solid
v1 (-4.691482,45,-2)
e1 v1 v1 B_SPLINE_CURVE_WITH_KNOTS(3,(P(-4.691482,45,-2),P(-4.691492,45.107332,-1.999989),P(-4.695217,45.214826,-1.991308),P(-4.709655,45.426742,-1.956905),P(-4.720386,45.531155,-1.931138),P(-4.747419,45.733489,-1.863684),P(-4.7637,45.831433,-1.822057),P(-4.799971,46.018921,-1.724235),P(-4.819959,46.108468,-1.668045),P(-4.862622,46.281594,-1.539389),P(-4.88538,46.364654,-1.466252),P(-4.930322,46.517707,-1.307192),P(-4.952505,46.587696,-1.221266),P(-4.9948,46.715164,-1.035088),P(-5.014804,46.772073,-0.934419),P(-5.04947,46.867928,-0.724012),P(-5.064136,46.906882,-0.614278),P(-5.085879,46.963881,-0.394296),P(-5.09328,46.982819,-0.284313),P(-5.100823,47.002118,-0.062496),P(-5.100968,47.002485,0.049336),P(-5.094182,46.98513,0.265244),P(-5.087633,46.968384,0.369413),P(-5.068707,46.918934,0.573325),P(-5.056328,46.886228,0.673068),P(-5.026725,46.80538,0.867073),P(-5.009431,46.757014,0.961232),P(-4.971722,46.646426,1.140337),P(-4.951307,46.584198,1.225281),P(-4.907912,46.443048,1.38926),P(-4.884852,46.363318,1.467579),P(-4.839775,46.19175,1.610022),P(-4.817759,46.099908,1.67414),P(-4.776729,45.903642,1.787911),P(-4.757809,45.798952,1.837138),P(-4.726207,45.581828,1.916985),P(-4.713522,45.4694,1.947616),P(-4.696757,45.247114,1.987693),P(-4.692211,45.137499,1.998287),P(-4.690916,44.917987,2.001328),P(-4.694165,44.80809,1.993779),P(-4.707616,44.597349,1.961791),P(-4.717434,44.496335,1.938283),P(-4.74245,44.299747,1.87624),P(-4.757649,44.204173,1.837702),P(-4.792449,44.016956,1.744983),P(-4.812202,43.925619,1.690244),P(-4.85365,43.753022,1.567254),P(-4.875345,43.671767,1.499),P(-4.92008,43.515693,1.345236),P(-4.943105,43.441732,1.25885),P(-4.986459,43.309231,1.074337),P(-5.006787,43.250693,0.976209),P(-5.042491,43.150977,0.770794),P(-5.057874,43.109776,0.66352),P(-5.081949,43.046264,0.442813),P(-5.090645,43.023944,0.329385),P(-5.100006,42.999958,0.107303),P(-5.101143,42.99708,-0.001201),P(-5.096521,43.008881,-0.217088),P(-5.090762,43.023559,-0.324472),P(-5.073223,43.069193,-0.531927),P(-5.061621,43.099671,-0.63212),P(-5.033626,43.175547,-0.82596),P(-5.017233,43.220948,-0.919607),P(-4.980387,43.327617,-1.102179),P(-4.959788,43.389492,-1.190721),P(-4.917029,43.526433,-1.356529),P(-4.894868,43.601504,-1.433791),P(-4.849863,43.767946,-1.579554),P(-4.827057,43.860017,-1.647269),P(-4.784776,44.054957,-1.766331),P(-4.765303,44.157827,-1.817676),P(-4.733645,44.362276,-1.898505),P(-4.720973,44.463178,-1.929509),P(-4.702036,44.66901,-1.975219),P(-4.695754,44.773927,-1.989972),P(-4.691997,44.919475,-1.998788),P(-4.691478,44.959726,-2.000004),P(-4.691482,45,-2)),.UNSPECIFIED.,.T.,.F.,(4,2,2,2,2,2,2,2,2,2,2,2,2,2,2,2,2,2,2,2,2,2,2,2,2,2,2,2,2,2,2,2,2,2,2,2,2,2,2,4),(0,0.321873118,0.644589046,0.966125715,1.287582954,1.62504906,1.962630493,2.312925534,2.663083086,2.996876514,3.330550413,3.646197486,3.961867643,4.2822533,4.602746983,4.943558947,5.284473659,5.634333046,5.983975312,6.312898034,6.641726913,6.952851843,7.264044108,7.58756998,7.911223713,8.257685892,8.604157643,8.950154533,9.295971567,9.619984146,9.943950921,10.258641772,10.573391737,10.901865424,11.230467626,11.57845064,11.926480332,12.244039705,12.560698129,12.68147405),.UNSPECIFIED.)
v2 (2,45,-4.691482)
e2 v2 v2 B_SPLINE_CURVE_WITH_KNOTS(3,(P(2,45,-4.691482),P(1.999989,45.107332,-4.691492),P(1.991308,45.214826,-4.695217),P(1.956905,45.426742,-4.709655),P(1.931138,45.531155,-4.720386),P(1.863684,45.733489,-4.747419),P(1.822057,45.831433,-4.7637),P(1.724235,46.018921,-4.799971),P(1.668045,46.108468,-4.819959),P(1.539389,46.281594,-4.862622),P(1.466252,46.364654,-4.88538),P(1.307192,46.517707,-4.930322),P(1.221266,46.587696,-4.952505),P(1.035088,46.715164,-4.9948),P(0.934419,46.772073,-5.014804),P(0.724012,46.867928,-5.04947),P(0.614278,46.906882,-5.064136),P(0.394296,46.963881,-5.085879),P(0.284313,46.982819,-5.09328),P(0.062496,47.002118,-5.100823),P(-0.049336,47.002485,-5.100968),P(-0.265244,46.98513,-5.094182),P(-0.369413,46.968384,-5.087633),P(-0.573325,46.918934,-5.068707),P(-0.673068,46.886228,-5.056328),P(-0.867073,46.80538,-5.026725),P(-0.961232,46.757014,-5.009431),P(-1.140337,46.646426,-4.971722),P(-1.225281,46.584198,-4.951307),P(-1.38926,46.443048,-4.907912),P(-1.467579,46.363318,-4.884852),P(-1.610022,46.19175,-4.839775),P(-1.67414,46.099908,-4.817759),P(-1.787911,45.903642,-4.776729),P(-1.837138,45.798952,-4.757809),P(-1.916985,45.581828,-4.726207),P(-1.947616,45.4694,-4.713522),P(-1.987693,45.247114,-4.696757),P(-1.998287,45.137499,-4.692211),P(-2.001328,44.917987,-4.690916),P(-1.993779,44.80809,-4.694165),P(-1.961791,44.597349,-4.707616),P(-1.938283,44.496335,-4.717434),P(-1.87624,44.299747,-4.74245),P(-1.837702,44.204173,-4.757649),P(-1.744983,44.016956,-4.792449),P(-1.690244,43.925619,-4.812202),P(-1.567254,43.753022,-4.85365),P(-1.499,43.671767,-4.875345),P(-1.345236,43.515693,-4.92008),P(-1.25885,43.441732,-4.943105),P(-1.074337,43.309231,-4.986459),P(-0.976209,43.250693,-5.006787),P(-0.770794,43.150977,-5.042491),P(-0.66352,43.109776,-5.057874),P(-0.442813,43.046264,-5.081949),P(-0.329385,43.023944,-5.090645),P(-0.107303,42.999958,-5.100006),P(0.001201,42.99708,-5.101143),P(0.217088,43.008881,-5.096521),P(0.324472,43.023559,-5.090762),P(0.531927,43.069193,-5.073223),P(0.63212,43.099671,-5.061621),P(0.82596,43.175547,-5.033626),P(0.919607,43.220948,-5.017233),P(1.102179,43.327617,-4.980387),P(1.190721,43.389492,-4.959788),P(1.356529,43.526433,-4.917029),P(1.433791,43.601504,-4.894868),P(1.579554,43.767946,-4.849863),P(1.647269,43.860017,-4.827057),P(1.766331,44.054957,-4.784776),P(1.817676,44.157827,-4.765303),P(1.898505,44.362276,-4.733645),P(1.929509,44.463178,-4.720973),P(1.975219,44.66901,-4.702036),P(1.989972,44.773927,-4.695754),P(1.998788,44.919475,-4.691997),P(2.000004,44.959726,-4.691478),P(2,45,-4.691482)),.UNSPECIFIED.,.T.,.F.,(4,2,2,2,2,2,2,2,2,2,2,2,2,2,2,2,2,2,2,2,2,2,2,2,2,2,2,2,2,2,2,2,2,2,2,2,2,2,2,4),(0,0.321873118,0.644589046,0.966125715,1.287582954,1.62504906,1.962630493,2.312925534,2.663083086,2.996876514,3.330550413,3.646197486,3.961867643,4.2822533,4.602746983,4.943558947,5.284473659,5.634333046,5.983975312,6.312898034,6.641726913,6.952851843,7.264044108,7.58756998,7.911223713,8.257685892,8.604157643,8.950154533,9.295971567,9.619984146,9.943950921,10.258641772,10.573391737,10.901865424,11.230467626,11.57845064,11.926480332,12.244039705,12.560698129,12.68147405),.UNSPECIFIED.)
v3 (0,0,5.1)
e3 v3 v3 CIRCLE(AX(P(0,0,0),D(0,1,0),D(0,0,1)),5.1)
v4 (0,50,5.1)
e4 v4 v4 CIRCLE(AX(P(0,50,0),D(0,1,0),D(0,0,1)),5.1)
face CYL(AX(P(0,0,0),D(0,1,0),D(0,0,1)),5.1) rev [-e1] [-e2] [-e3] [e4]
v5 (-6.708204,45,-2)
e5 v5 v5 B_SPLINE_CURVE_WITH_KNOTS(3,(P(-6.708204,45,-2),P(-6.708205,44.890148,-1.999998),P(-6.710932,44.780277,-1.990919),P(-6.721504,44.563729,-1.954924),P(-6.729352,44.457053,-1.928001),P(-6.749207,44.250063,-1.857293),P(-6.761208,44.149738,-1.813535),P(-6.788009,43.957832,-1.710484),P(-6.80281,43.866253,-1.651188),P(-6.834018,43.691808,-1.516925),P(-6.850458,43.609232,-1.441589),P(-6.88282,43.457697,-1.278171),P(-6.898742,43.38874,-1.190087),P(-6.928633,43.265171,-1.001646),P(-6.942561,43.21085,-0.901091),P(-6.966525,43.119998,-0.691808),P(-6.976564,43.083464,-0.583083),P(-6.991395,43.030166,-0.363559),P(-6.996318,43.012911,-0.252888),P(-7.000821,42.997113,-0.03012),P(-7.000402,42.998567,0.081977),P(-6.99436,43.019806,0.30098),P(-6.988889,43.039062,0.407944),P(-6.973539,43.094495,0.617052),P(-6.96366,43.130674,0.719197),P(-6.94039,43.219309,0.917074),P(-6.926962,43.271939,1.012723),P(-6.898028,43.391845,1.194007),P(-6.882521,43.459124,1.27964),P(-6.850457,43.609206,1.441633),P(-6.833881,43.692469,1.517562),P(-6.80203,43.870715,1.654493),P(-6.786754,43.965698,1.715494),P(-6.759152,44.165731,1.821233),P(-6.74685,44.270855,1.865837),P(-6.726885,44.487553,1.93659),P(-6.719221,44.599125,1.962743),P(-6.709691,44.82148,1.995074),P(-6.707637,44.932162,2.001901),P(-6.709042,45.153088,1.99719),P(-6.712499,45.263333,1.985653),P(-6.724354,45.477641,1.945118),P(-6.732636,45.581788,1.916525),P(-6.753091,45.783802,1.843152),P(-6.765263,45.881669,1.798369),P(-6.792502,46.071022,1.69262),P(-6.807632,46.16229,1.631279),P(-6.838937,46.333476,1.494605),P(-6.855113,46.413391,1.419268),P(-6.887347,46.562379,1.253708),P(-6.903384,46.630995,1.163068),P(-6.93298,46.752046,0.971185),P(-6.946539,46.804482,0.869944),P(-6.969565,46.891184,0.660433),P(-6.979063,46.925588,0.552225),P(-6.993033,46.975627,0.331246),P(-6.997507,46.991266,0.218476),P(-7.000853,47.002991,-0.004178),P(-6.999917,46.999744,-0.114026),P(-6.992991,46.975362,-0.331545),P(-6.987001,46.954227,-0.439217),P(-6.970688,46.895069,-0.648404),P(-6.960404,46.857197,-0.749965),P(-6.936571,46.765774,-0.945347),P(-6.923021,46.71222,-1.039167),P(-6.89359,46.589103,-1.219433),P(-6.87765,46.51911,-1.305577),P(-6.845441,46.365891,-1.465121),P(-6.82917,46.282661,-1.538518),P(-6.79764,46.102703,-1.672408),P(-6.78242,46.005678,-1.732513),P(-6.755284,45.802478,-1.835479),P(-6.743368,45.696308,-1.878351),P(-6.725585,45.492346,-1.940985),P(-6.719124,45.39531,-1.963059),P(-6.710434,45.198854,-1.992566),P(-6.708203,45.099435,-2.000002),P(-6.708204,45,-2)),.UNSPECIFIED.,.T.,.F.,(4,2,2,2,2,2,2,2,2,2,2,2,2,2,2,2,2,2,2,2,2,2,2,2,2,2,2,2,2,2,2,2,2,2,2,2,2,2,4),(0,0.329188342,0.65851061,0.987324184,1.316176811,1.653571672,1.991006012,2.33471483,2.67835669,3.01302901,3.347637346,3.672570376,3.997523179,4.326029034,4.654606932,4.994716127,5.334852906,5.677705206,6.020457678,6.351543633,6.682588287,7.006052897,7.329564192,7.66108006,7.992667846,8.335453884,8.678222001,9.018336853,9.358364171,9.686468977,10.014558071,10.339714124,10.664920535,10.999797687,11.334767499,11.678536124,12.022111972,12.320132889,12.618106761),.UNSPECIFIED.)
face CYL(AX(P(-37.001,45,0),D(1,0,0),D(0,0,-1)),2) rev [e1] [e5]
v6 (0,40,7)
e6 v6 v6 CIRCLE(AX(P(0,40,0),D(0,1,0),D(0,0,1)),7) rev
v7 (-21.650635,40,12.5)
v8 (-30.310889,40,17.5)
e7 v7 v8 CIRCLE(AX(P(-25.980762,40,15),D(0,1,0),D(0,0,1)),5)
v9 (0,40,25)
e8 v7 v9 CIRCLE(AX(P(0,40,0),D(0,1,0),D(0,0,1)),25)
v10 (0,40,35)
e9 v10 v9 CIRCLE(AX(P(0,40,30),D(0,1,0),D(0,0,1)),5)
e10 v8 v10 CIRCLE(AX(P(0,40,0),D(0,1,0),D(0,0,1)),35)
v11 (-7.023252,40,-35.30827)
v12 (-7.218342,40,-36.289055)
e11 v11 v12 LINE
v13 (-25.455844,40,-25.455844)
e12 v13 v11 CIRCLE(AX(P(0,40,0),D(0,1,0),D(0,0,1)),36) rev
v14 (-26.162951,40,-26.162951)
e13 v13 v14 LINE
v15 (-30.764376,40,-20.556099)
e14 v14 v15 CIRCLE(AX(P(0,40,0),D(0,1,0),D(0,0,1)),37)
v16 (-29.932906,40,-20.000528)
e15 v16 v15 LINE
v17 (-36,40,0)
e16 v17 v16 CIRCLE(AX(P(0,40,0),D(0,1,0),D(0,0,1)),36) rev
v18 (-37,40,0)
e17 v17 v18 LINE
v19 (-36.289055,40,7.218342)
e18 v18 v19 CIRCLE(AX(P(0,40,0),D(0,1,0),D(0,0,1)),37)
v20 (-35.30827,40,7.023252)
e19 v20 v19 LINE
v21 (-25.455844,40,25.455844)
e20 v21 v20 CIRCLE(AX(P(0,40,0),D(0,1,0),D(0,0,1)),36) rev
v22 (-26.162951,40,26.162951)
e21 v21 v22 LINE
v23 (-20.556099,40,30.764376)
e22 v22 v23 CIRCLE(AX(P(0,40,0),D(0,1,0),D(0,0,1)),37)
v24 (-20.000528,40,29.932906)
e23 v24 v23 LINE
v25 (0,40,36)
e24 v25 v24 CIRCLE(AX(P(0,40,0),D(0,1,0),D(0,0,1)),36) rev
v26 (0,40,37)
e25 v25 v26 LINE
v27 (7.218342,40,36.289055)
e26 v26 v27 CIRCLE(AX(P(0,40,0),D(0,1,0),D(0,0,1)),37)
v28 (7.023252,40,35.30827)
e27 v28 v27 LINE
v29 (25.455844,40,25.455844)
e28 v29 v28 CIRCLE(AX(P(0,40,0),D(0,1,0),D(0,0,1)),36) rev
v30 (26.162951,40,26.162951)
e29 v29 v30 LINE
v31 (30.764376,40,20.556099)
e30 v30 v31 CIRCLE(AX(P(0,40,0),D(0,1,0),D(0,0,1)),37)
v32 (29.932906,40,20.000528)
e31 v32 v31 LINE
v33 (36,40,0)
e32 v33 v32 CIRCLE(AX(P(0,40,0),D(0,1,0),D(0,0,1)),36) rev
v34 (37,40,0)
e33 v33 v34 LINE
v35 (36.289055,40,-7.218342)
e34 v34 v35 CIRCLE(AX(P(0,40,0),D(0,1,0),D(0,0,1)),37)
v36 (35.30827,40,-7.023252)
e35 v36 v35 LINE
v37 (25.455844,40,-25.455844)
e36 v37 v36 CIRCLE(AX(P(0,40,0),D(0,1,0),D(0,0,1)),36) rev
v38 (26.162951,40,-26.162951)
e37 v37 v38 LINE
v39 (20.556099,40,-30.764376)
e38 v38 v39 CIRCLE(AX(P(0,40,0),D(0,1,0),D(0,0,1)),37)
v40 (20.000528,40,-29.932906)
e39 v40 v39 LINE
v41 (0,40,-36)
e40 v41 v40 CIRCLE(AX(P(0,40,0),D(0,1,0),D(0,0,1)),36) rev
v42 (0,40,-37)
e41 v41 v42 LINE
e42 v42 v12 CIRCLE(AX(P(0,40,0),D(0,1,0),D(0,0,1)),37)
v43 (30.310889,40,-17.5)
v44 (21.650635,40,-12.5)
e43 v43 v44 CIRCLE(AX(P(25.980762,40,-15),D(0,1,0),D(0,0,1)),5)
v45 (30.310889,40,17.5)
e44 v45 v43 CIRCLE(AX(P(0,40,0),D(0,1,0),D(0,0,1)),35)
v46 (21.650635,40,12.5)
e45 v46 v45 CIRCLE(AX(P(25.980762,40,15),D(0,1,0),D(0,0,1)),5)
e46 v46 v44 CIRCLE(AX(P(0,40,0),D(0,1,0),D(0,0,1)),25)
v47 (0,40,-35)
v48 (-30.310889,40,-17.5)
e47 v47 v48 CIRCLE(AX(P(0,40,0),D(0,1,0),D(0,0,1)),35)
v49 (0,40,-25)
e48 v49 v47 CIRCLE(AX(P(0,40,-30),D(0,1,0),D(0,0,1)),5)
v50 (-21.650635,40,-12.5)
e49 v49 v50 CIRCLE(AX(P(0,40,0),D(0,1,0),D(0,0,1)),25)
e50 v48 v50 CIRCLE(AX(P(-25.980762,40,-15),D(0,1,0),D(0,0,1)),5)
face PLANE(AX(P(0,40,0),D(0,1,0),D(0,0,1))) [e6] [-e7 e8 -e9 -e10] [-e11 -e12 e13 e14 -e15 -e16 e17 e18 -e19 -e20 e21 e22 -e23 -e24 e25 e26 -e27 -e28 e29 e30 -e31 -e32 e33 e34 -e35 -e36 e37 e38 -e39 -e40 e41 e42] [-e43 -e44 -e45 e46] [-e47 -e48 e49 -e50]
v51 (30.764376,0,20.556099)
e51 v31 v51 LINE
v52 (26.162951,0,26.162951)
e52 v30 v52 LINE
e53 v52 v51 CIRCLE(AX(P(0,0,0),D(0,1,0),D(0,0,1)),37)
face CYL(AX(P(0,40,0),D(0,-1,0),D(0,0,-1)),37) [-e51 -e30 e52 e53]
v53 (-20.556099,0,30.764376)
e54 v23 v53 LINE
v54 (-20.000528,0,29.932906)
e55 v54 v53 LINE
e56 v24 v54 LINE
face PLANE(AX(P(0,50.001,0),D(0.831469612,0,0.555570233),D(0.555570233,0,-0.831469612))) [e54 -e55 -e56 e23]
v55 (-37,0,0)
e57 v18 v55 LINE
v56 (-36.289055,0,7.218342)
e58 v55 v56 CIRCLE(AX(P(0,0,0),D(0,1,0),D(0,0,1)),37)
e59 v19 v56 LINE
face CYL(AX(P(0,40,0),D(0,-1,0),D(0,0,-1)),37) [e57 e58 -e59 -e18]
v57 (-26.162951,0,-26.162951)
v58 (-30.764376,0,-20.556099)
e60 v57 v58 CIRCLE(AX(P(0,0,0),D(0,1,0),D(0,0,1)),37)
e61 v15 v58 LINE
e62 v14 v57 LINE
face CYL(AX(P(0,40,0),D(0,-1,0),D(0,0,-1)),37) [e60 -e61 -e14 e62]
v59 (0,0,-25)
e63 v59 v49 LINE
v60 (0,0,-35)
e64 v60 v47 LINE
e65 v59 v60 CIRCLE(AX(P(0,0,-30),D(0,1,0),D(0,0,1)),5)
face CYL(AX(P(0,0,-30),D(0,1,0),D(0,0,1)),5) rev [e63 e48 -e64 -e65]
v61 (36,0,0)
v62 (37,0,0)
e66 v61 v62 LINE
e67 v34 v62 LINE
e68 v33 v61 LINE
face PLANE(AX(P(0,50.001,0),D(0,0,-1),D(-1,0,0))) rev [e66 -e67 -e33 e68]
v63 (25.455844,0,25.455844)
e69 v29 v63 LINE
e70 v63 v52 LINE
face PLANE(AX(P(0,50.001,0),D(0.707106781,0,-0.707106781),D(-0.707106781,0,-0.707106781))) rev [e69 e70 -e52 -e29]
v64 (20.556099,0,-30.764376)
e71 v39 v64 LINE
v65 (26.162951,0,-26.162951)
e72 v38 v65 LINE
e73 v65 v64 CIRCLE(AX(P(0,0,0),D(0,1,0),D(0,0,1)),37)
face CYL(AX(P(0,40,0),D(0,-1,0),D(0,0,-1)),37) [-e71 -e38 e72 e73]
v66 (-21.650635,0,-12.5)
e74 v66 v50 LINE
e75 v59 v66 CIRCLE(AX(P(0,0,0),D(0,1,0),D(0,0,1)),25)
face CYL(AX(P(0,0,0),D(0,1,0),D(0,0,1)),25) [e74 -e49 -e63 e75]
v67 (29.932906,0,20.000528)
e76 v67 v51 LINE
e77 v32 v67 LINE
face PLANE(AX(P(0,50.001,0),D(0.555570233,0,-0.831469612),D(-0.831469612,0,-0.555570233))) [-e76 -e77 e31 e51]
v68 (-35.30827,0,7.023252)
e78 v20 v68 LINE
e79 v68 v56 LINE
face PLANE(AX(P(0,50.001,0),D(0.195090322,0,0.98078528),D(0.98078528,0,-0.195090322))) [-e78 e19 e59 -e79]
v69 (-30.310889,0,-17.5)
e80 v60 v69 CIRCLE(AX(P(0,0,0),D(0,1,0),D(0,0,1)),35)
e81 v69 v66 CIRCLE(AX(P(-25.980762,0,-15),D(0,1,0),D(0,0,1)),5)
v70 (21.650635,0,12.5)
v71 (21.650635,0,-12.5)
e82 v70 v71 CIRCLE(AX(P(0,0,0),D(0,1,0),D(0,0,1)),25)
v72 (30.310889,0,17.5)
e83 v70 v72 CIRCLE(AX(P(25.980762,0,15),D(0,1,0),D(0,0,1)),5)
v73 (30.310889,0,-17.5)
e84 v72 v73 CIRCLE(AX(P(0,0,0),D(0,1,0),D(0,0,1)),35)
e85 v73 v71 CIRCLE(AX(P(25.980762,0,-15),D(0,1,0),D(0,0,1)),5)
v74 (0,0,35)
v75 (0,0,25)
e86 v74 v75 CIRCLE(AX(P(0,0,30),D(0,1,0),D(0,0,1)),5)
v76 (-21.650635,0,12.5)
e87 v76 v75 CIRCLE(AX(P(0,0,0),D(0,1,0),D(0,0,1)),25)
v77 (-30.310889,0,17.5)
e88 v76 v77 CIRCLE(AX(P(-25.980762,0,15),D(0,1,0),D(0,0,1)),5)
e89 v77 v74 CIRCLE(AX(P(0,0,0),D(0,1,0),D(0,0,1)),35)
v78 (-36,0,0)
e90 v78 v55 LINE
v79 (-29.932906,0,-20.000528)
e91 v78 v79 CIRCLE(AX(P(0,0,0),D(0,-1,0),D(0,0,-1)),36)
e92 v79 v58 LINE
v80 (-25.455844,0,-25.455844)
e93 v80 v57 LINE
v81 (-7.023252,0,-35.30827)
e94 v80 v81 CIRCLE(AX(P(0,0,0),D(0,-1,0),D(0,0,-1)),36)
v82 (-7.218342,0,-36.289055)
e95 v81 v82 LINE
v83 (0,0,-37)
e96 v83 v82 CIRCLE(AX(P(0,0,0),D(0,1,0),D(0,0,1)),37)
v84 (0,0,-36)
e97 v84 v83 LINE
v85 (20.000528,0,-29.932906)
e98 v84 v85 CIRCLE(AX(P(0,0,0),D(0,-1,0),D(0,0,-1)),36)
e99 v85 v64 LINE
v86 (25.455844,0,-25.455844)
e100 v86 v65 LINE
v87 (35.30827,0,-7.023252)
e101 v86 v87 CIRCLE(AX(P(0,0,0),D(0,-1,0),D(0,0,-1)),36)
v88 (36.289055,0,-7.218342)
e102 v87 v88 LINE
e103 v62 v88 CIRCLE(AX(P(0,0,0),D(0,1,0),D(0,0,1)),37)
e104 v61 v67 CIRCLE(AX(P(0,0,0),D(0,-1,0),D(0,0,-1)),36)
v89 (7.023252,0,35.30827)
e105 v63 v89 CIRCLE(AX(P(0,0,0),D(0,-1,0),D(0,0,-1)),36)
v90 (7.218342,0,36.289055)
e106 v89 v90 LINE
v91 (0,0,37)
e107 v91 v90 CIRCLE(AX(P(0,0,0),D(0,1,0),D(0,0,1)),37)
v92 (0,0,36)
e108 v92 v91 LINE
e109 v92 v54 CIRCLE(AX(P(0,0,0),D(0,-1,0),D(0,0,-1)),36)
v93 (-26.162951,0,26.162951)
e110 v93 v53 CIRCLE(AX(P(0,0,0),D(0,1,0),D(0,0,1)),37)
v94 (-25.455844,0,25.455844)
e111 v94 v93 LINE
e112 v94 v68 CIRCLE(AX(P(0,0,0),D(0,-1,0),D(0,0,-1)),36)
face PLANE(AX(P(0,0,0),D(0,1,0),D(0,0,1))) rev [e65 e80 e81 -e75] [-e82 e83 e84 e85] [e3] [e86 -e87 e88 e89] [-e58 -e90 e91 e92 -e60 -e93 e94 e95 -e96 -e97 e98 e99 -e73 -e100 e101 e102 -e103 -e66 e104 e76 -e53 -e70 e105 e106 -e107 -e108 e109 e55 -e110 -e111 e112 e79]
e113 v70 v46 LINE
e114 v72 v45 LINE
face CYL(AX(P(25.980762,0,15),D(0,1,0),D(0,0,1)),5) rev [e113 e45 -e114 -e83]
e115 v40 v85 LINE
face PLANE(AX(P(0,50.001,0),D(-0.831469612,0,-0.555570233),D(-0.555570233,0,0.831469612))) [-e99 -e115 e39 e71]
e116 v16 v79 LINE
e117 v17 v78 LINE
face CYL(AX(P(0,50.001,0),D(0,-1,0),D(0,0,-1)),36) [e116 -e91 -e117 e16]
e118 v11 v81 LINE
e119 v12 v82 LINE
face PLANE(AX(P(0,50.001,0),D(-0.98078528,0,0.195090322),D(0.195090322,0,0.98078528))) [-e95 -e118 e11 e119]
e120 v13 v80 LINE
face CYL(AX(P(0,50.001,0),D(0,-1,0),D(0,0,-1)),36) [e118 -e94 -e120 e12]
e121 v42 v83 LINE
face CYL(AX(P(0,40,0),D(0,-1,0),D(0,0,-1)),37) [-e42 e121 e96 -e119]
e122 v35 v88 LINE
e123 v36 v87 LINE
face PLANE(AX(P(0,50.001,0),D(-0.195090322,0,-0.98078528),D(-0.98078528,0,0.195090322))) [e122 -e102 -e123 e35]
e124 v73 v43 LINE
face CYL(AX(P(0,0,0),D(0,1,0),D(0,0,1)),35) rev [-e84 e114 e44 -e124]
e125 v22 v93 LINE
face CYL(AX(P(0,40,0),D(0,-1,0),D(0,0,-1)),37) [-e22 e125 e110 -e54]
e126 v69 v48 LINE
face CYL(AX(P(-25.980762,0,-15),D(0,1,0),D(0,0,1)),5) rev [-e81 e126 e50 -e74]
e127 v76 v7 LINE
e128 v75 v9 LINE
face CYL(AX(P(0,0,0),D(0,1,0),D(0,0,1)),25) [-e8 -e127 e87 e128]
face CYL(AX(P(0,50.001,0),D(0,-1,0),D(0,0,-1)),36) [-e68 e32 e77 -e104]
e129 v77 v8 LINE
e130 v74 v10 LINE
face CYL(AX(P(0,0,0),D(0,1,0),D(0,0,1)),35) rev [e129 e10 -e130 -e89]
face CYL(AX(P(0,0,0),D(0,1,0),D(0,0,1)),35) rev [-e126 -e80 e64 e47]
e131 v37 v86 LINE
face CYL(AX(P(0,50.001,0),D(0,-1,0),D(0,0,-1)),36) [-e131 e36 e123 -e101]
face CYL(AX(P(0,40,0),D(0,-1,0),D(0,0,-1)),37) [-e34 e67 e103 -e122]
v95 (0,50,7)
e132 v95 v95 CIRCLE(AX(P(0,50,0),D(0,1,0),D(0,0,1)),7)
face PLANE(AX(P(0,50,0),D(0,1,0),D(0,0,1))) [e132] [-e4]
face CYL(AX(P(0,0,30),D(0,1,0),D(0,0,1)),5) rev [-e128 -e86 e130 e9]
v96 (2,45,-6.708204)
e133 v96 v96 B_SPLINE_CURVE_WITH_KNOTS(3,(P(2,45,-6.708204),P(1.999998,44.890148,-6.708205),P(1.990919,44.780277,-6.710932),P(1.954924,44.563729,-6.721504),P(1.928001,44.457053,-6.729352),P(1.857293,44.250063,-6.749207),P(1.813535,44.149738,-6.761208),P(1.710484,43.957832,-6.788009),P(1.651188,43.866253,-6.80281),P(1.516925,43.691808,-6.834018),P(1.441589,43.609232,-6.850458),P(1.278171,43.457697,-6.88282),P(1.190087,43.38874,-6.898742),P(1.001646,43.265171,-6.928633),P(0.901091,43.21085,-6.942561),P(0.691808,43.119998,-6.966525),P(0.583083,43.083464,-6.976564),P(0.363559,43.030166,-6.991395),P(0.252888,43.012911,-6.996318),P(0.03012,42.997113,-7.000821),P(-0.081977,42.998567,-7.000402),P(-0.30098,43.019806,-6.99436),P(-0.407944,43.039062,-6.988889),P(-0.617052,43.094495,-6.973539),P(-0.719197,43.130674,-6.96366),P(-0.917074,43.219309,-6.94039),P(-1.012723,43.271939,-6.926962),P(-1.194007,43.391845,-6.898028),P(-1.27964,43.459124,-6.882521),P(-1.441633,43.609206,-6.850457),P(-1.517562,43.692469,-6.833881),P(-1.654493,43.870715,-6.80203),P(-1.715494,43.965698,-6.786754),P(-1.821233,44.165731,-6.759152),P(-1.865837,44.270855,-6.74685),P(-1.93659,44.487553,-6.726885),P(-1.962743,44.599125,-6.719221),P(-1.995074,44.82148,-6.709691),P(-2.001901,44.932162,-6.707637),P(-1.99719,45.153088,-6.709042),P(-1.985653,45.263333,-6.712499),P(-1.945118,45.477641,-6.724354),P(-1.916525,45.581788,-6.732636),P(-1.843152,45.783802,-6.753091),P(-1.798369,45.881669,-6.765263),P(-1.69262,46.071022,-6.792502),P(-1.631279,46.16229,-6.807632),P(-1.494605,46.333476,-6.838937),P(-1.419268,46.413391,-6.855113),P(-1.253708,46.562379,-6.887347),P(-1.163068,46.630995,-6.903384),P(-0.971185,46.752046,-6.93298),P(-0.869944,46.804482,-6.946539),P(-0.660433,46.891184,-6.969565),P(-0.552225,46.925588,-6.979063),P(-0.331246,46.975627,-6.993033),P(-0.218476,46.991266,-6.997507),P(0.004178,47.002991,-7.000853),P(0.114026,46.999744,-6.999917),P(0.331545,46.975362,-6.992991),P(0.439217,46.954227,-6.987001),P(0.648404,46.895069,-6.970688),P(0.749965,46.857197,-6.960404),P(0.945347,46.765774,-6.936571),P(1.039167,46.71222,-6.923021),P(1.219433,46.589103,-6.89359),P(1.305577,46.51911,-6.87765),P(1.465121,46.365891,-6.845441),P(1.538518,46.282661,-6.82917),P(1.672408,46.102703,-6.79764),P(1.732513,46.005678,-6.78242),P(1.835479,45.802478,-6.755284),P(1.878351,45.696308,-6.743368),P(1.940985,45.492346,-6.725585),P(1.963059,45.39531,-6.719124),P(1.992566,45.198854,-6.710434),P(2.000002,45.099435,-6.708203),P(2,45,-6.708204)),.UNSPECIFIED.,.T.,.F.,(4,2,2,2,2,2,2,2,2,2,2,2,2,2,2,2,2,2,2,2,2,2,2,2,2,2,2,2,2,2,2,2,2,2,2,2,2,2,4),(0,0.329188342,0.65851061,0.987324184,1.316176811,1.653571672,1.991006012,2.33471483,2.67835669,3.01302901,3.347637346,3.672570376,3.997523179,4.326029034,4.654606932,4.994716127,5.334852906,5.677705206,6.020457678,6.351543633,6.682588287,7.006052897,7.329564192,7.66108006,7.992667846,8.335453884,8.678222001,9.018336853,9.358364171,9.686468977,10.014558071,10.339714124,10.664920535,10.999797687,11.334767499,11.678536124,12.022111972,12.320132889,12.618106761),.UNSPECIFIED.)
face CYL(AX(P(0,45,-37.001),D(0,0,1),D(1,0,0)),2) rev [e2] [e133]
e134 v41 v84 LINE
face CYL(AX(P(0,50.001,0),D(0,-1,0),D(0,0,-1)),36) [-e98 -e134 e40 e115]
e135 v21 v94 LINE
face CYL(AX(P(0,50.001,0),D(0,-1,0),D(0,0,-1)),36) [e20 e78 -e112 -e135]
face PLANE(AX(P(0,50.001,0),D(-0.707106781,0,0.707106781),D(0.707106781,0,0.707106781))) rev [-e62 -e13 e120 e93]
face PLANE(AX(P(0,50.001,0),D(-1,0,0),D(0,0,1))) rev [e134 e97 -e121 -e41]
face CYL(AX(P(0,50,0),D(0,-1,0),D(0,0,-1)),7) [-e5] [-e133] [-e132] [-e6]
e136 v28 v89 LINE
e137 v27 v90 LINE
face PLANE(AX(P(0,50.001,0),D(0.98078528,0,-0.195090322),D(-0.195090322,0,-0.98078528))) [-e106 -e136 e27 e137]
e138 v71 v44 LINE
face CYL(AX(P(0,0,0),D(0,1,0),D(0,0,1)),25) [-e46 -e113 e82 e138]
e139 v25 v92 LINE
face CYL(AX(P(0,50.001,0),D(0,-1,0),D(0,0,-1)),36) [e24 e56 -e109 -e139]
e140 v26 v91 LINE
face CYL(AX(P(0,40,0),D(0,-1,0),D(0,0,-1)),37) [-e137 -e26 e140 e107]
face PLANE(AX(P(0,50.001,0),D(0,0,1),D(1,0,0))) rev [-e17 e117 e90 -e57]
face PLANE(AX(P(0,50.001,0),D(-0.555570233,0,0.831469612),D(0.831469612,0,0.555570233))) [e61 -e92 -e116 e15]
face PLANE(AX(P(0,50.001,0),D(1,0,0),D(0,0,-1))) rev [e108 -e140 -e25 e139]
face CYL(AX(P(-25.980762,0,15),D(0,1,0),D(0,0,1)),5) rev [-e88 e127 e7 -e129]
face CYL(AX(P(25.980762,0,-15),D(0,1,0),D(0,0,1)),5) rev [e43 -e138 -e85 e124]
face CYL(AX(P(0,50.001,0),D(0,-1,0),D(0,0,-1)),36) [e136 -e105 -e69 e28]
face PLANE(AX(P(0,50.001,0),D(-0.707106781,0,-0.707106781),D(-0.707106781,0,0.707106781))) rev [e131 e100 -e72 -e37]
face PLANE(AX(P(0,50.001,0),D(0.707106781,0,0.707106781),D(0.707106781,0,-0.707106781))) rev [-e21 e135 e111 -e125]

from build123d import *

# Parameters (mm, degrees)
SKETCH_1_R               = 37
EXTRUDE_1_DEPTH          = 40
SKETCH_2_R               = 5.1
CUT_EXTRUDE_1_DEPTH      = 40
CUT_EXTRUDE_START        = -40
CUT_EXTRUDE_2_DEPTH      = 40
SKETCH_4_R               = 7
SKETCH_4_R_2             = 5.1
EXTRUDE_2_DEPTH          = 10
CUT_EXTRUDE_3_REACH      = 74.374
CUT_EXTRUDE_3_END_RADIUS = 7
SKETCH_6_R               = 2
CUT_EXTRUDE_4_REACH      = 74.374
CUT_EXTRUDE_4_END_RADIUS = 7
SKETCH_7_R               = 2
CUT_EXTRUDE_7_REACH      = 74.374


# Read off the part's stored shape, not the designer's step: the extrude step
with BuildPart() as part:
    # 草图1 → 凸台-拉伸1 (new body)
    with BuildSketch(Plane(origin=(0, 0, 0), x_dir=(1, 0, 0), z_dir=(0, 1, 0))):
        with Locations(Location((0, 0, 0), (0, 0, 270))):
            Circle(SKETCH_1_R)
    extrude(amount=EXTRUDE_1_DEPTH)

    # 草图2 → 切除-拉伸1 (cut)
    with BuildSketch(Plane(origin=(0, 40, 0), x_dir=(1, 0, 0), z_dir=(0, 1, 0))):
        with Locations(Location((0, 0, 0), (0, 0, 270))):
            Circle(SKETCH_2_R)
    extrude(amount=-CUT_EXTRUDE_1_DEPTH, mode=Mode.SUBTRACT)

    # 切除-拉伸2 outline → 切除-拉伸2 (cut)
    with BuildSketch(Plane(origin=(0, 40, 0), x_dir=(1, 0, 0), z_dir=(0, 1, 0)).offset(CUT_EXTRUDE_START)):
        with BuildLine():
            ThreePointArc((0, 25), (5, 30), (0, 35))
            ThreePointArc((0, 35), (-17.5, 30.310889132), (-30.310889132, 17.5))
            ThreePointArc((-30.310889132, 17.5), (-28.480762114, 10.669872981), (-21.650635095, 12.5))
            ThreePointArc((-21.650635095, 12.5), (-12.5, 21.650635095), (0, 25))
        make_face()
        with BuildLine():
            ThreePointArc((-21.650635095, -12.5), (-28.480762114, -10.669872981), (-30.310889132, -17.5))
            ThreePointArc((-30.310889132, -17.5), (-17.5, -30.310889132), (0, -35))
            ThreePointArc((0, -35), (5, -30), (0, -25))
            ThreePointArc((0, -25), (-12.5, -21.650635095), (-21.650635095, -12.5))
        make_face()
        with BuildLine():
            ThreePointArc((21.650635095, -12.5), (23.480762113, -19.330127019), (30.310889132, -17.5))
            ThreePointArc((30.310889132, -17.5), (35, 0), (30.310889132, 17.5))
            ThreePointArc((30.310889132, 17.5), (23.480762113, 19.330127019), (21.650635095, 12.5))
            ThreePointArc((21.650635095, 12.5), (25, 0), (21.650635095, -12.5))
        make_face()
    extrude(amount=CUT_EXTRUDE_2_DEPTH, mode=Mode.SUBTRACT)

    # 草图4 → 凸台-拉伸2 (add, symmetric)
    with BuildSketch(Plane(origin=(0, 40, 0), x_dir=(1, 0, 0), z_dir=(0, 1, 0))):
        with Locations(Location((0, 0, 0), (0, 0, 270))):
            Circle(SKETCH_4_R)
        with Locations(Location((0, 0, 0), (0, 0, 270))):
            Circle(SKETCH_4_R_2, mode=Mode.SUBTRACT)
    extrude(amount=EXTRUDE_2_DEPTH, both=True)

    # 切除-拉伸3: up to this cylinder (the profile starts inside it)
    cut_extrude_3_end = Plane(origin=(0, 45, 0), z_dir=(0, -1, 0)) * Cylinder(CUT_EXTRUDE_3_END_RADIUS, 163.748, mode=Mode.PRIVATE)
    # 草图6 → 切除-拉伸3 (cut, up to the surface)
    with BuildSketch(Plane.XY, mode=Mode.PRIVATE) as cut_extrude_3_sk1:
        with Locations((0, 45)):
            Circle(SKETCH_6_R)
    cut_extrude_3_tool1 = extrude(cut_extrude_3_sk1.sketch, amount=-CUT_EXTRUDE_3_REACH, mode=Mode.PRIVATE) & cut_extrude_3_end
    add(cut_extrude_3_tool1.solids().sort_by_distance((0, 45, 0))[0], mode=Mode.SUBTRACT)

    # 切除-拉伸4: up to this cylinder (the profile starts inside it)
    cut_extrude_4_end = Plane(origin=(0, 45, 0), z_dir=(0, -1, 0)) * Cylinder(CUT_EXTRUDE_4_END_RADIUS, 163.748, mode=Mode.PRIVATE)
    # 草图7 → 切除-拉伸4 (cut, up to the surface)
    with BuildSketch(Plane(origin=(0, 0, 0), x_dir=(0, 0, -1), z_dir=(1, 0, 0)), mode=Mode.PRIVATE) as cut_extrude_4_sk1:
        with Locations((0, 45)):
            Circle(SKETCH_7_R)
    cut_extrude_4_tool1 = extrude(cut_extrude_4_sk1.sketch, amount=-CUT_EXTRUDE_4_REACH, mode=Mode.PRIVATE) & cut_extrude_4_end
    add(cut_extrude_4_tool1.solids().sort_by_distance((0, 45, 0))[0], mode=Mode.SUBTRACT)

    # 草图10 → 切除-拉伸7 (cut, up to next)
    with BuildSketch(Plane.XZ, mode=Mode.PRIVATE) as cut_extrude_7_sk1:
        with BuildLine():
            Line((-36.289055375, 7.218341915), (-35.308270095, 7.023251593))
            ThreePointArc((-35.308270095, 7.023251593), (-34.449852086, 10.450248381), (-33.25966317, 13.776603565))
            Line((-33.25966317, 13.776603565), (-34.183542703, 14.159286998))
            ThreePointArc((-34.183542703, 14.159286998), (-35.406792422, 10.740533058), (-36.289055375, 7.218341915))
        make_face()
    cut_extrude_7_tool1 = extrude(cut_extrude_7_sk1.sketch, amount=-CUT_EXTRUDE_7_REACH, mode=Mode.PRIVATE) & part.part
    # 草图10 → 切除-拉伸7 (cut, up to next)
    with BuildSketch(Plane.XZ, mode=Mode.PRIVATE) as cut_extrude_7_sk2:
        with BuildLine():
            Line((-34.183542703, 14.159286998), (-33.25966317, 13.776603565))
            ThreePointArc((-33.25966317, 13.776603565), (-31.749165517, 16.970282526), (-29.932906043, 20.000528389))
            Line((-29.932906043, 20.000528389), (-30.764375655, 20.556098622))
            ThreePointArc((-30.764375655, 20.556098622), (-32.631086781, 17.441679263), (-34.183542703, 14.159286998))
        make_face()
    cut_extrude_7_tool2 = extrude(cut_extrude_7_sk2.sketch, amount=-CUT_EXTRUDE_7_REACH, mode=Mode.PRIVATE) & part.part
    # 草图10 → 切除-拉伸7 (cut, up to next)
    with BuildSketch(Plane.XZ, mode=Mode.PRIVATE) as cut_extrude_7_sk3:
        with BuildLine():
            Line((-30.764375655, 20.556098622), (-29.932906043, 20.000528389))
            ThreePointArc((-29.932906043, 20.000528389), (-27.828376321, 22.83815823), (-25.455844123, 25.455844123))
            Line((-25.455844123, 25.455844123), (-26.162950904, 26.162950904))
            ThreePointArc((-26.162950904, 26.162950904), (-28.601386774, 23.472551514), (-30.764375655, 20.556098622))
        make_face()
    cut_extrude_7_tool3 = extrude(cut_extrude_7_sk3.sketch, amount=-CUT_EXTRUDE_7_REACH, mode=Mode.PRIVATE) & part.part
    # 草图10 → 切除-拉伸7 (cut, up to next)
    with BuildSketch(Plane.XZ, mode=Mode.PRIVATE) as cut_extrude_7_sk4:
        with BuildLine():
            Line((-20.556098622, 30.764375655), (-20.000528389, 29.932906043))
            ThreePointArc((-20.000528389, 29.932906043), (-16.970282526, 31.749165517), (-13.776603565, 33.25966317))
            Line((-13.776603565, 33.25966317), (-14.159286998, 34.183542703))
            ThreePointArc((-14.159286998, 34.183542703), (-17.441679263, 32.631086781), (-20.556098622, 30.764375655))
        make_face()
    cut_extrude_7_tool4 = extrude(cut_extrude_7_sk4.sketch, amount=-CUT_EXTRUDE_7_REACH, mode=Mode.PRIVATE) & part.part
    # 草图10 → 切除-拉伸7 (cut, up to next)
    with BuildSketch(Plane.XZ, mode=Mode.PRIVATE) as cut_extrude_7_sk5:
        with BuildLine():
            Line((-14.159286998, 34.183542703), (-13.776603565, 33.25966317))
            ThreePointArc((-13.776603565, 33.25966317), (-10.450248381, 34.449852086), (-7.023251593, 35.308270095))
            Line((-7.023251593, 35.308270095), (-7.218341915, 36.289055375))
            ThreePointArc((-7.218341915, 36.289055375), (-10.740533058, 35.406792422), (-14.159286998, 34.183542703))
        make_face()
    cut_extrude_7_tool5 = extrude(cut_extrude_7_sk5.sketch, amount=-CUT_EXTRUDE_7_REACH, mode=Mode.PRIVATE) & part.part
    # 草图10 → 切除-拉伸7 (cut, up to next)
    with BuildSketch(Plane.XZ, mode=Mode.PRIVATE) as cut_extrude_7_sk6:
        with BuildLine():
            ThreePointArc((-7.023251593, 35.308270095), (-3.528617052, 35.82665016), (0, 36))
            Line((0, 36), (0, 37))
            ThreePointArc((0, 37), (-3.626634192, 36.821834887), (-7.218341915, 36.289055375))
            Line((-7.218341915, 36.289055375), (-7.023251593, 35.308270095))
        make_face()
    cut_extrude_7_tool6 = extrude(cut_extrude_7_sk6.sketch, amount=-CUT_EXTRUDE_7_REACH, mode=Mode.PRIVATE) & part.part
    # 草图10 → 切除-拉伸7 (cut, up to next)
    with BuildSketch(Plane.XZ, mode=Mode.PRIVATE) as cut_extrude_7_sk7:
        with BuildLine():
            Line((7.218341915, 36.289055375), (7.023251593, 35.308270095))
            ThreePointArc((7.023251593, 35.308270095), (10.450248381, 34.449852086), (13.776603565, 33.25966317))
            Line((13.776603565, 33.25966317), (14.159286998, 34.183542703))
            ThreePointArc((14.159286998, 34.183542703), (10.740533058, 35.406792422), (7.218341915, 36.289055375))
        make_face()
    cut_extrude_7_tool7 = extrude(cut_extrude_7_sk7.sketch, amount=-CUT_EXTRUDE_7_REACH, mode=Mode.PRIVATE) & part.part
    # 草图10 → 切除-拉伸7 (cut, up to next)
    with BuildSketch(Plane.XZ, mode=Mode.PRIVATE) as cut_extrude_7_sk8:
        with BuildLine():
            Line((14.159286998, 34.183542703), (13.776603565, 33.25966317))
            ThreePointArc((13.776603565, 33.25966317), (16.970282526, 31.749165517), (20.000528389, 29.932906043))
            Line((20.000528389, 29.932906043), (20.556098622, 30.764375655))
            ThreePointArc((20.556098622, 30.764375655), (17.441679263, 32.631086781), (14.159286998, 34.183542703))
        make_face()
    cut_extrude_7_tool8 = extrude(cut_extrude_7_sk8.sketch, amount=-CUT_EXTRUDE_7_REACH, mode=Mode.PRIVATE) & part.part
    # 草图10 → 切除-拉伸7 (cut, up to next)
    with BuildSketch(Plane.XZ, mode=Mode.PRIVATE) as cut_extrude_7_sk9:
        with BuildLine():
            Line((20.556098622, 30.764375655), (20.000528389, 29.932906043))
            ThreePointArc((20.000528389, 29.932906043), (22.83815823, 27.828376321), (25.455844123, 25.455844123))
            Line((25.455844123, 25.455844123), (26.162950904, 26.162950904))
            ThreePointArc((26.162950904, 26.162950904), (23.472551514, 28.601386774), (20.556098622, 30.764375655))
        make_face()
    cut_extrude_7_tool9 = extrude(cut_extrude_7_sk9.sketch, amount=-CUT_EXTRUDE_7_REACH, mode=Mode.PRIVATE) & part.part
    # 草图10 → 切除-拉伸7 (cut, up to next)
    with BuildSketch(Plane.XZ, mode=Mode.PRIVATE) as cut_extrude_7_sk10:
        with BuildLine():
            Line((30.764375655, 20.556098622), (29.932906043, 20.000528389))
            ThreePointArc((29.932906043, 20.000528389), (31.749165517, 16.970282526), (33.25966317, 13.776603565))
            Line((33.25966317, 13.776603565), (34.183542703, 14.159286998))
            ThreePointArc((34.183542703, 14.159286998), (32.631086781, 17.441679263), (30.764375655, 20.556098622))
        make_face()
    cut_extrude_7_tool10 = extrude(cut_extrude_7_sk10.sketch, amount=-CUT_EXTRUDE_7_REACH, mode=Mode.PRIVATE) & part.part
    # 草图10 → 切除-拉伸7 (cut, up to next)
    with BuildSketch(Plane.XZ, mode=Mode.PRIVATE) as cut_extrude_7_sk11:
        with BuildLine():
            Line((34.183542703, 14.159286998), (33.25966317, 13.776603565))
            ThreePointArc((33.25966317, 13.776603565), (34.449852086, 10.450248381), (35.308270095, 7.023251593))
            Line((35.308270095, 7.023251593), (36.289055375, 7.218341915))
            ThreePointArc((36.289055375, 7.218341915), (35.406792422, 10.740533058), (34.183542703, 14.159286998))
        make_face()
    cut_extrude_7_tool11 = extrude(cut_extrude_7_sk11.sketch, amount=-CUT_EXTRUDE_7_REACH, mode=Mode.PRIVATE) & part.part
    # 草图10 → 切除-拉伸7 (cut, up to next)
    with BuildSketch(Plane.XZ, mode=Mode.PRIVATE) as cut_extrude_7_sk12:
        with BuildLine():
            Line((36.289055375, 7.218341915), (35.308270095, 7.023251593))
            ThreePointArc((35.308270095, 7.023251593), (35.82665016, 3.528617052), (36, 0))
            Line((36, 0), (37, 0))
            ThreePointArc((37, 0), (36.821834887, 3.626634192), (36.289055375, 7.218341915))
        make_face()
    cut_extrude_7_tool12 = extrude(cut_extrude_7_sk12.sketch, amount=-CUT_EXTRUDE_7_REACH, mode=Mode.PRIVATE) & part.part
    # 草图10 → 切除-拉伸7 (cut, up to next)
    with BuildSketch(Plane.XZ, mode=Mode.PRIVATE) as cut_extrude_7_sk13:
        with BuildLine():
            Line((36.289055375, -7.218341915), (35.308270095, -7.023251593))
            ThreePointArc((35.308270095, -7.023251593), (34.449852086, -10.450248381), (33.25966317, -13.776603565))
            Line((33.25966317, -13.776603565), (34.183542703, -14.159286998))
            ThreePointArc((34.183542703, -14.159286998), (35.406792422, -10.740533058), (36.289055375, -7.218341915))
        make_face()
    cut_extrude_7_tool13 = extrude(cut_extrude_7_sk13.sketch, amount=-CUT_EXTRUDE_7_REACH, mode=Mode.PRIVATE) & part.part
    # 草图10 → 切除-拉伸7 (cut, up to next)
    with BuildSketch(Plane.XZ, mode=Mode.PRIVATE) as cut_extrude_7_sk14:
        with BuildLine():
            Line((34.183542703, -14.159286998), (33.25966317, -13.776603565))
            ThreePointArc((33.25966317, -13.776603565), (31.749165517, -16.970282526), (29.932906043, -20.000528389))
            Line((29.932906043, -20.000528389), (30.764375655, -20.556098622))
            ThreePointArc((30.764375655, -20.556098622), (32.631086781, -17.441679263), (34.183542703, -14.159286998))
        make_face()
    cut_extrude_7_tool14 = extrude(cut_extrude_7_sk14.sketch, amount=-CUT_EXTRUDE_7_REACH, mode=Mode.PRIVATE) & part.part
    # 草图10 → 切除-拉伸7 (cut, up to next)
    with BuildSketch(Plane.XZ, mode=Mode.PRIVATE) as cut_extrude_7_sk15:
        with BuildLine():
            Line((30.764375655, -20.556098622), (29.932906043, -20.000528389))
            ThreePointArc((29.932906043, -20.000528389), (27.828376321, -22.83815823), (25.455844123, -25.455844123))
            Line((25.455844123, -25.455844123), (26.162950904, -26.162950904))
            ThreePointArc((26.162950904, -26.162950904), (28.601386774, -23.472551514), (30.764375655, -20.556098622))
        make_face()
    cut_extrude_7_tool15 = extrude(cut_extrude_7_sk15.sketch, amount=-CUT_EXTRUDE_7_REACH, mode=Mode.PRIVATE) & part.part
    # 草图10 → 切除-拉伸7 (cut, up to next)
    with BuildSketch(Plane.XZ, mode=Mode.PRIVATE) as cut_extrude_7_sk16:
        with BuildLine():
            Line((20.556098622, -30.764375655), (20.000528389, -29.932906043))
            ThreePointArc((20.000528389, -29.932906043), (16.970282526, -31.749165517), (13.776603565, -33.25966317))
            Line((13.776603565, -33.25966317), (14.159286998, -34.183542703))
            ThreePointArc((14.159286998, -34.183542703), (17.441679263, -32.631086781), (20.556098622, -30.764375655))
        make_face()
    cut_extrude_7_tool16 = extrude(cut_extrude_7_sk16.sketch, amount=-CUT_EXTRUDE_7_REACH, mode=Mode.PRIVATE) & part.part
    # 草图10 → 切除-拉伸7 (cut, up to next)
    with BuildSketch(Plane.XZ, mode=Mode.PRIVATE) as cut_extrude_7_sk17:
        with BuildLine():
            Line((14.159286998, -34.183542703), (13.776603565, -33.25966317))
            ThreePointArc((13.776603565, -33.25966317), (10.450248381, -34.449852086), (7.023251593, -35.308270095))
            Line((7.023251593, -35.308270095), (7.218341915, -36.289055375))
            ThreePointArc((7.218341915, -36.289055375), (10.740533058, -35.406792422), (14.159286998, -34.183542703))
        make_face()
    cut_extrude_7_tool17 = extrude(cut_extrude_7_sk17.sketch, amount=-CUT_EXTRUDE_7_REACH, mode=Mode.PRIVATE) & part.part
    # 草图10 → 切除-拉伸7 (cut, up to next)
    with BuildSketch(Plane.XZ, mode=Mode.PRIVATE) as cut_extrude_7_sk18:
        with BuildLine():
            Line((7.218341915, -36.289055375), (7.023251593, -35.308270095))
            ThreePointArc((7.023251593, -35.308270095), (3.528617052, -35.82665016), (0, -36))
            Line((0, -36), (0, -37))
            ThreePointArc((0, -37), (3.626634192, -36.821834887), (7.218341915, -36.289055375))
        make_face()
    cut_extrude_7_tool18 = extrude(cut_extrude_7_sk18.sketch, amount=-CUT_EXTRUDE_7_REACH, mode=Mode.PRIVATE) & part.part
    # 草图10 → 切除-拉伸7 (cut, up to next)
    with BuildSketch(Plane.XZ, mode=Mode.PRIVATE) as cut_extrude_7_sk19:
        with BuildLine():
            Line((-7.218341915, -36.289055375), (-7.023251593, -35.308270095))
            ThreePointArc((-7.023251593, -35.308270095), (-10.450248381, -34.449852086), (-13.776603565, -33.25966317))
            Line((-13.776603565, -33.25966317), (-14.159286998, -34.183542703))
            ThreePointArc((-14.159286998, -34.183542703), (-10.740533058, -35.406792422), (-7.218341915, -36.289055375))
        make_face()
    cut_extrude_7_tool19 = extrude(cut_extrude_7_sk19.sketch, amount=-CUT_EXTRUDE_7_REACH, mode=Mode.PRIVATE) & part.part
    # 草图10 → 切除-拉伸7 (cut, up to next)
    with BuildSketch(Plane.XZ, mode=Mode.PRIVATE) as cut_extrude_7_sk20:
        with BuildLine():
            Line((-14.159286998, -34.183542703), (-13.776603565, -33.25966317))
            ThreePointArc((-13.776603565, -33.25966317), (-16.970282526, -31.749165517), (-20.000528389, -29.932906043))
            Line((-20.000528389, -29.932906043), (-20.556098622, -30.764375655))
            ThreePointArc((-20.556098622, -30.764375655), (-17.441679263, -32.631086781), (-14.159286998, -34.183542703))
        make_face()
    cut_extrude_7_tool20 = extrude(cut_extrude_7_sk20.sketch, amount=-CUT_EXTRUDE_7_REACH, mode=Mode.PRIVATE) & part.part
    # 草图10 → 切除-拉伸7 (cut, up to next)
    with BuildSketch(Plane.XZ, mode=Mode.PRIVATE) as cut_extrude_7_sk21:
        with BuildLine():
            Line((-20.556098622, -30.764375655), (-20.000528389, -29.932906043))
            ThreePointArc((-20.000528389, -29.932906043), (-22.83815823, -27.828376321), (-25.455844123, -25.455844123))
            Line((-25.455844123, -25.455844123), (-26.162950904, -26.162950904))
            ThreePointArc((-26.162950904, -26.162950904), (-23.472551514, -28.601386774), (-20.556098622, -30.764375655))
        make_face()
    cut_extrude_7_tool21 = extrude(cut_extrude_7_sk21.sketch, amount=-CUT_EXTRUDE_7_REACH, mode=Mode.PRIVATE) & part.part
    # 草图10 → 切除-拉伸7 (cut, up to next)
    with BuildSketch(Plane.XZ, mode=Mode.PRIVATE) as cut_extrude_7_sk22:
        with BuildLine():
            Line((-30.764375655, -20.556098622), (-29.932906043, -20.000528389))
            ThreePointArc((-29.932906043, -20.000528389), (-31.749165517, -16.970282526), (-33.25966317, -13.776603565))
            Line((-33.25966317, -13.776603565), (-34.183542703, -14.159286998))
            ThreePointArc((-34.183542703, -14.159286998), (-32.631086781, -17.441679263), (-30.764375655, -20.556098622))
        make_face()
    cut_extrude_7_tool22 = extrude(cut_extrude_7_sk22.sketch, amount=-CUT_EXTRUDE_7_REACH, mode=Mode.PRIVATE) & part.part
    # 草图10 → 切除-拉伸7 (cut, up to next)
    with BuildSketch(Plane.XZ, mode=Mode.PRIVATE) as cut_extrude_7_sk23:
        with BuildLine():
            Line((-34.183542703, -14.159286998), (-33.25966317, -13.776603565))
            ThreePointArc((-33.25966317, -13.776603565), (-34.449852086, -10.450248381), (-35.308270095, -7.023251593))
            Line((-35.308270095, -7.023251593), (-36.289055375, -7.218341915))
            ThreePointArc((-36.289055375, -7.218341915), (-35.406792422, -10.740533058), (-34.183542703, -14.159286998))
        make_face()
    cut_extrude_7_tool23 = extrude(cut_extrude_7_sk23.sketch, amount=-CUT_EXTRUDE_7_REACH, mode=Mode.PRIVATE) & part.part
    # 草图10 → 切除-拉伸7 (cut, up to next)
    with BuildSketch(Plane.XZ, mode=Mode.PRIVATE) as cut_extrude_7_sk24:
        with BuildLine():
            Line((-36.289055375, -7.218341915), (-35.308270095, -7.023251593))
            ThreePointArc((-35.308270095, -7.023251593), (-35.82665016, -3.528617052), (-36, 0))
            Line((-36, 0), (-37, 0))
            ThreePointArc((-37, 0), (-36.821834887, -3.626634192), (-36.289055375, -7.218341915))
        make_face()
    cut_extrude_7_tool24 = extrude(cut_extrude_7_sk24.sketch, amount=-CUT_EXTRUDE_7_REACH, mode=Mode.PRIVATE) & part.part
    add(cut_extrude_7_tool1.solids().sort_by_distance((-34.874422, 0, 10.57904))[0], mode=Mode.SUBTRACT)
    add(cut_extrude_7_tool2.solids().sort_by_distance((-32.140452, 0, 17.179429))[0], mode=Mode.SUBTRACT)
    add(cut_extrude_7_tool3.solids().sort_by_distance((-28.171342, 0, 23.119623))[0], mode=Mode.SUBTRACT)
    add(cut_extrude_7_tool4.solids().sort_by_distance((-17.179429, 0, 32.140452))[0], mode=Mode.SUBTRACT)
    add(cut_extrude_7_tool5.solids().sort_by_distance((-10.57904, 0, 34.874422))[0], mode=Mode.SUBTRACT)
    add(cut_extrude_7_tool6.solids().sort_by_distance((-3.572105, 0, 36.268189))[0], mode=Mode.SUBTRACT)
    add(cut_extrude_7_tool7.solids().sort_by_distance((10.57904, 0, 34.874422))[0], mode=Mode.SUBTRACT)
    add(cut_extrude_7_tool8.solids().sort_by_distance((17.179429, 0, 32.140452))[0], mode=Mode.SUBTRACT)
    add(cut_extrude_7_tool9.solids().sort_by_distance((23.119623, 0, 28.171342))[0], mode=Mode.SUBTRACT)
    add(cut_extrude_7_tool10.solids().sort_by_distance((32.140452, 0, 17.179429))[0], mode=Mode.SUBTRACT)
    add(cut_extrude_7_tool11.solids().sort_by_distance((34.874422, 0, 10.57904))[0], mode=Mode.SUBTRACT)
    add(cut_extrude_7_tool12.solids().sort_by_distance((36.268189, 0, 3.572105))[0], mode=Mode.SUBTRACT)
    add(cut_extrude_7_tool13.solids().sort_by_distance((34.874422, 0, -10.57904))[0], mode=Mode.SUBTRACT)
    add(cut_extrude_7_tool14.solids().sort_by_distance((32.140452, 0, -17.179429))[0], mode=Mode.SUBTRACT)
    add(cut_extrude_7_tool15.solids().sort_by_distance((28.171342, 0, -23.119623))[0], mode=Mode.SUBTRACT)
    add(cut_extrude_7_tool16.solids().sort_by_distance((17.179429, 0, -32.140452))[0], mode=Mode.SUBTRACT)
    add(cut_extrude_7_tool17.solids().sort_by_distance((10.57904, 0, -34.874422))[0], mode=Mode.SUBTRACT)
    add(cut_extrude_7_tool18.solids().sort_by_distance((3.572105, 0, -36.268189))[0], mode=Mode.SUBTRACT)
    add(cut_extrude_7_tool19.solids().sort_by_distance((-10.57904, 0, -34.874422))[0], mode=Mode.SUBTRACT)
    add(cut_extrude_7_tool20.solids().sort_by_distance((-17.179429, 0, -32.140452))[0], mode=Mode.SUBTRACT)
    add(cut_extrude_7_tool21.solids().sort_by_distance((-23.119623, 0, -28.171342))[0], mode=Mode.SUBTRACT)
    add(cut_extrude_7_tool22.solids().sort_by_distance((-32.140452, 0, -17.179429))[0], mode=Mode.SUBTRACT)
    add(cut_extrude_7_tool23.solids().sort_by_distance((-34.874422, 0, -10.57904))[0], mode=Mode.SUBTRACT)
    add(cut_extrude_7_tool24.solids().sort_by_distance((-36.268189, 0, -3.572105))[0], mode=Mode.SUBTRACT)


solid = part.part
